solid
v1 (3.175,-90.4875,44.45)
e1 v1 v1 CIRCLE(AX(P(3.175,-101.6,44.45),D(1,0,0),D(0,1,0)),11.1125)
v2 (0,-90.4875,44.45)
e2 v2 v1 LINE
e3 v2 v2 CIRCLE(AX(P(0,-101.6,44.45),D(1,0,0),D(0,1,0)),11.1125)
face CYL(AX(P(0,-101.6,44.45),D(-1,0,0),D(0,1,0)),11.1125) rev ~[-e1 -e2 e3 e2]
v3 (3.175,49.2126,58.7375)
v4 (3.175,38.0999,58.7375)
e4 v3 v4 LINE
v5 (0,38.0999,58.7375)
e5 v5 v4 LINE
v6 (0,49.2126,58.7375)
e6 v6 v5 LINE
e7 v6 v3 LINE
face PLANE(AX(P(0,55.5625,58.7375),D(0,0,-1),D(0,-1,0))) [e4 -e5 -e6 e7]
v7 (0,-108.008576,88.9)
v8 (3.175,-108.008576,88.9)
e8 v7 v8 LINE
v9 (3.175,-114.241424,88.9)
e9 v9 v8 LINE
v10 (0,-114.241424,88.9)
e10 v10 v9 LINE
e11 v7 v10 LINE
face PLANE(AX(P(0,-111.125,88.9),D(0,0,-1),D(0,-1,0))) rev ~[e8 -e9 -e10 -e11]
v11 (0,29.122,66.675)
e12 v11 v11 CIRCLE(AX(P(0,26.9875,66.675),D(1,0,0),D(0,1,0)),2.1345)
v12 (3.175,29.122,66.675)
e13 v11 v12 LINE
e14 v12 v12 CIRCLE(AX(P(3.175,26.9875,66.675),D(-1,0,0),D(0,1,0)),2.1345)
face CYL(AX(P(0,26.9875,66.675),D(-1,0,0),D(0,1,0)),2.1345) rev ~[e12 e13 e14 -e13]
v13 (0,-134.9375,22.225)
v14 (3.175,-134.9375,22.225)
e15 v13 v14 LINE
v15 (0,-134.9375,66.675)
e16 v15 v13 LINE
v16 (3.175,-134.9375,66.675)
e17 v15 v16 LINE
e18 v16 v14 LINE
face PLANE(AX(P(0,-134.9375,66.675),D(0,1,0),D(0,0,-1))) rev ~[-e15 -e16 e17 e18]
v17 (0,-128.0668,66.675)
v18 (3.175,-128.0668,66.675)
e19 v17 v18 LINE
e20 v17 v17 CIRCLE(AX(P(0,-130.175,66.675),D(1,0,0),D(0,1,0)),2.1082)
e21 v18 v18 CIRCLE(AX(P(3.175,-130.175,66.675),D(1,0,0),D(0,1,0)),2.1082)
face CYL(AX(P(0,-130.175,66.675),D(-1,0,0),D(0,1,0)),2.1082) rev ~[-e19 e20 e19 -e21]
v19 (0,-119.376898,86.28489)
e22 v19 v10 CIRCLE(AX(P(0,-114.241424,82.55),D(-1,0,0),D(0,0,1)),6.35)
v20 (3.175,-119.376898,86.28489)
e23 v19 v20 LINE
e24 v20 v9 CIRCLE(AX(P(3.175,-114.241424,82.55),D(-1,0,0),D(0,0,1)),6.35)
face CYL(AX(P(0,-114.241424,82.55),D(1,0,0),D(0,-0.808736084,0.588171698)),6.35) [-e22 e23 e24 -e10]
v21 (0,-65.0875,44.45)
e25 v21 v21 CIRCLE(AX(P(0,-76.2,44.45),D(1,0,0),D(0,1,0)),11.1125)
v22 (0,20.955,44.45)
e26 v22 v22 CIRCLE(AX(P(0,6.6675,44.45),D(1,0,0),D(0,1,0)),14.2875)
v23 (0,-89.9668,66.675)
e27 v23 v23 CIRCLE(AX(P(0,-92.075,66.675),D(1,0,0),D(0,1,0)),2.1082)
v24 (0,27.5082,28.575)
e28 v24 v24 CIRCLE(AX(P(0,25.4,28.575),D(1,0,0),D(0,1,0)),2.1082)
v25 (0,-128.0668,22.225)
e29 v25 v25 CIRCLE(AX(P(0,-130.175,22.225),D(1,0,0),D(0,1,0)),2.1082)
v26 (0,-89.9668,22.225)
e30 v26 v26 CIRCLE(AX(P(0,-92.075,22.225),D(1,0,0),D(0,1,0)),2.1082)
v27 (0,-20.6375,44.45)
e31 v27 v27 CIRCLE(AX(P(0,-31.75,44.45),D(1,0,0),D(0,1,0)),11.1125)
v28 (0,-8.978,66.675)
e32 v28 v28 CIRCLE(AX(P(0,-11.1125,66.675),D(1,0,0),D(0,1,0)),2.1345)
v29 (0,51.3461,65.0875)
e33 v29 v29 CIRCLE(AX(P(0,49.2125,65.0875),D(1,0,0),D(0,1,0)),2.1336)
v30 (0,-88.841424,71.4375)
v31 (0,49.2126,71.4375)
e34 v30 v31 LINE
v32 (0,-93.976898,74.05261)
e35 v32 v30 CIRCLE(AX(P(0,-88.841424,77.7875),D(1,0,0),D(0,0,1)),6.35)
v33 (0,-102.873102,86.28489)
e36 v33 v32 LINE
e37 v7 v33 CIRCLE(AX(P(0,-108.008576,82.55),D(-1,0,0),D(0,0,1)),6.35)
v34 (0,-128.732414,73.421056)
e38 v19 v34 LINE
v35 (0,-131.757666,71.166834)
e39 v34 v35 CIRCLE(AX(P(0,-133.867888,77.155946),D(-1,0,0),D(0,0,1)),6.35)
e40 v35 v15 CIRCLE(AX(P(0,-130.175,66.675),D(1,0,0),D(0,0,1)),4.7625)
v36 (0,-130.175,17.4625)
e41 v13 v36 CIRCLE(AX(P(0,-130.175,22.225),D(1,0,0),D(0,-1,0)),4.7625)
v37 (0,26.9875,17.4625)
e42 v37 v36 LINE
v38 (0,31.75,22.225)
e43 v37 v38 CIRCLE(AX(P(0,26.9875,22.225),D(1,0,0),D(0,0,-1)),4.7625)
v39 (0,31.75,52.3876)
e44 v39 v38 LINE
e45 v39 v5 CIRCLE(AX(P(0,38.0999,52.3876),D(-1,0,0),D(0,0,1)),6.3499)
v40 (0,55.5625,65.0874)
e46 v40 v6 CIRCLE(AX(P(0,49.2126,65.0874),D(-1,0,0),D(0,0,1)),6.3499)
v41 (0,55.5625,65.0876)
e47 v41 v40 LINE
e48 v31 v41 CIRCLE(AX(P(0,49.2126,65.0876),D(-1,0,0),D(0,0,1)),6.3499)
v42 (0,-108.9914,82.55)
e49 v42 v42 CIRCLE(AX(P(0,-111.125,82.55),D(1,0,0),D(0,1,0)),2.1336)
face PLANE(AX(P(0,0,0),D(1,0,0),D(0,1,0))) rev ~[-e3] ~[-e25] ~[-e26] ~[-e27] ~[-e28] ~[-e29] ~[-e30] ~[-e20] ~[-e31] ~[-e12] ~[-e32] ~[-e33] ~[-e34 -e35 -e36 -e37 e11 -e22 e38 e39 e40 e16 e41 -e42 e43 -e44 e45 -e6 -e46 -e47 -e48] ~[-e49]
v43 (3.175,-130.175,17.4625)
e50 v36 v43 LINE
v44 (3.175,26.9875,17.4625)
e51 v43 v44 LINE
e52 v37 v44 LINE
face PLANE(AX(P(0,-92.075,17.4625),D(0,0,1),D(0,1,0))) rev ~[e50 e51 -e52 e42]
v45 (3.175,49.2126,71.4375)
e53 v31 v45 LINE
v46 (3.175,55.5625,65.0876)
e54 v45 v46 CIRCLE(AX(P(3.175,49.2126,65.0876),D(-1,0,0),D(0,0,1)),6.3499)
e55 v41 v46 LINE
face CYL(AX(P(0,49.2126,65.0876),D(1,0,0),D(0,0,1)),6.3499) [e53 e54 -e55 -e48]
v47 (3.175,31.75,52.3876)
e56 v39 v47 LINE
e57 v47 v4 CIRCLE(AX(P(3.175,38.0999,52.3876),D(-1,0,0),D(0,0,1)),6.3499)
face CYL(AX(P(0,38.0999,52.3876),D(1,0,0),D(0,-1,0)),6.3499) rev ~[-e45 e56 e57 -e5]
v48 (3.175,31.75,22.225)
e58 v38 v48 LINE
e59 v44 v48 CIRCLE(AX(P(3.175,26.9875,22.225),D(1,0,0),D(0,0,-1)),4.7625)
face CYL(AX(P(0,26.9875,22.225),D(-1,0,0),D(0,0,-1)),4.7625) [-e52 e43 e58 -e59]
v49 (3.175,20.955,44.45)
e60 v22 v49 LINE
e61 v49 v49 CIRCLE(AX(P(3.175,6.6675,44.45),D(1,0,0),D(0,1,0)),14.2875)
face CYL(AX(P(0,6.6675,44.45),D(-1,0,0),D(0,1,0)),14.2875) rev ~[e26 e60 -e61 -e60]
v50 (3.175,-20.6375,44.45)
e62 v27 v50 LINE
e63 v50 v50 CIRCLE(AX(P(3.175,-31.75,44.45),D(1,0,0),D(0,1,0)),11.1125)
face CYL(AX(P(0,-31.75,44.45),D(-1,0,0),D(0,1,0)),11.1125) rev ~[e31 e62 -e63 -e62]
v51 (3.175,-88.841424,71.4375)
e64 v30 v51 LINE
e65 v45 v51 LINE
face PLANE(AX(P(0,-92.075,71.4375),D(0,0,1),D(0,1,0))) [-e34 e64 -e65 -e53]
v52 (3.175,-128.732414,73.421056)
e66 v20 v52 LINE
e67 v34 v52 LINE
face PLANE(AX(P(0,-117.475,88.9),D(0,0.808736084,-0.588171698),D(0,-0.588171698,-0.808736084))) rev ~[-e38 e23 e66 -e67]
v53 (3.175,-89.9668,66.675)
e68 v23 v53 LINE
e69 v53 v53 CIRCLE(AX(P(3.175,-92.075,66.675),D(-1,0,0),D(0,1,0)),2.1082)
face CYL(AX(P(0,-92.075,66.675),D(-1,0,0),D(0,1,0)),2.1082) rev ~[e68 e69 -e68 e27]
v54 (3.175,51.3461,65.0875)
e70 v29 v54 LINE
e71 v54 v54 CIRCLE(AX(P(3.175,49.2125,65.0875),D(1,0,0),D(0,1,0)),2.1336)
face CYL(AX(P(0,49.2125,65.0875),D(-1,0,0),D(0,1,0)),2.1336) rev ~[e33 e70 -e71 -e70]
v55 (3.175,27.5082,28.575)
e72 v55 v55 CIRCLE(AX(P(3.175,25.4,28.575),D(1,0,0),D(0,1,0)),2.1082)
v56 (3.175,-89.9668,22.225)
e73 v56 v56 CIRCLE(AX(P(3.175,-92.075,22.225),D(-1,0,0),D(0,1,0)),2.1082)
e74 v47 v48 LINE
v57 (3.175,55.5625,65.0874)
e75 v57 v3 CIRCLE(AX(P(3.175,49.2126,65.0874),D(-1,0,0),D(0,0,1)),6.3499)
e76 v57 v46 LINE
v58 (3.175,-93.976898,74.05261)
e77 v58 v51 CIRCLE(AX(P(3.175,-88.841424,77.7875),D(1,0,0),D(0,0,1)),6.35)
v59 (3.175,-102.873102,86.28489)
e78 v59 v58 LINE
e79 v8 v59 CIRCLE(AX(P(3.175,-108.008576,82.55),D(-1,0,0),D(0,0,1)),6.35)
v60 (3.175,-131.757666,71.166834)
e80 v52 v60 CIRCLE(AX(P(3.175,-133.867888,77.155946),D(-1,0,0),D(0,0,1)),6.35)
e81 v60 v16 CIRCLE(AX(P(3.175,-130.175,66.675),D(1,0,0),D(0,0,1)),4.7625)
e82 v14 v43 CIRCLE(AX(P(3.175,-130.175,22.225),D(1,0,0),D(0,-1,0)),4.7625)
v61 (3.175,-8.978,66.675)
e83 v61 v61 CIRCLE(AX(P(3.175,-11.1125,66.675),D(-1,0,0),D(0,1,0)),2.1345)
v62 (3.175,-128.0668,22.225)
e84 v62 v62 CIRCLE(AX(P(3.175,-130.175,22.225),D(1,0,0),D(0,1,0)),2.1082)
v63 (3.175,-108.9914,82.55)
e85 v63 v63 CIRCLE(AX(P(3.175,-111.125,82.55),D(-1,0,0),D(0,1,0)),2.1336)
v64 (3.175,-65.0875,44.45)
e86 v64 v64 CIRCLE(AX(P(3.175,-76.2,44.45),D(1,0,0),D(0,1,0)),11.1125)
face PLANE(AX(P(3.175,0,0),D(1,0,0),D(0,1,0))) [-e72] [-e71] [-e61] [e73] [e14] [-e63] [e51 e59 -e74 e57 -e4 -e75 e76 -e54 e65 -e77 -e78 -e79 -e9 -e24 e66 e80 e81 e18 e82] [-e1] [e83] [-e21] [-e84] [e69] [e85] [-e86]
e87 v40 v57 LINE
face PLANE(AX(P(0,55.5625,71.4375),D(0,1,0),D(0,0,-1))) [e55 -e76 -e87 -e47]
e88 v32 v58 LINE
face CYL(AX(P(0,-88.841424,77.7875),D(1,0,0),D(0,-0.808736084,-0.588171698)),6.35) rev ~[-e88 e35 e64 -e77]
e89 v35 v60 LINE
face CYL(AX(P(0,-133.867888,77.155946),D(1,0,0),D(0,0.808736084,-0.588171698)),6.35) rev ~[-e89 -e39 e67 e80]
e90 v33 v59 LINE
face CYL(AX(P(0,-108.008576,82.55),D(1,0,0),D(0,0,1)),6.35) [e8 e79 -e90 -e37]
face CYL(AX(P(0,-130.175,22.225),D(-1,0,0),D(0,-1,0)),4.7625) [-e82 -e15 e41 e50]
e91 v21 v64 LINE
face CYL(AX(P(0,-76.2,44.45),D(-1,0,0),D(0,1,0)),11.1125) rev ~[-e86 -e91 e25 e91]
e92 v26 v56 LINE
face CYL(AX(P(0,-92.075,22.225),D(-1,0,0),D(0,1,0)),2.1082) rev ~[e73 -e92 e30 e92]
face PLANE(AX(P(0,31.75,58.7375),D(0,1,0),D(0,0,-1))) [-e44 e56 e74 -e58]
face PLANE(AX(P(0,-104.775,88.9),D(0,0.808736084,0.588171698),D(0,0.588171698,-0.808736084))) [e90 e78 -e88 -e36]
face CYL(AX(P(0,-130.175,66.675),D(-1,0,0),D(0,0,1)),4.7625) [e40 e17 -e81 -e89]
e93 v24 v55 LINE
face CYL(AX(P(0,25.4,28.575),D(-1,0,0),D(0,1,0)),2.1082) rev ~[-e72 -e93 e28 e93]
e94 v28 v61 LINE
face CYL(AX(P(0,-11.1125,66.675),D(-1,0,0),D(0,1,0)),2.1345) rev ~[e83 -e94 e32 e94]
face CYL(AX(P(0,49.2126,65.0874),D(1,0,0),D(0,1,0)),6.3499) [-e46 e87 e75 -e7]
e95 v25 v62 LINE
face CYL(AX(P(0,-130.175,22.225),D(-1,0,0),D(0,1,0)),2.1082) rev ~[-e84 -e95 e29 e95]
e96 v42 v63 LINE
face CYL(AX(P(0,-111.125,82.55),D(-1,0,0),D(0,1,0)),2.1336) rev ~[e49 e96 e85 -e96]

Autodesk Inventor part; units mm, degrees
ref_plane "YZ Plane" through (0, 0, 0) normal (1, 0, 0) x (0, 1, 0)
ref_plane "XZ Plane" through (0, 0, 0) normal (0, 1, 0) x (-1, 0, 0)
ref_plane "XY Plane" through (0, 0, 0) normal (0, 0, 1) x (1, 0, 0)
sketch "Sketch1" plane through (0, 0, 0) normal (1, 0, 0) x (0, 1, 0)
  circle A0 centre (-31.75, 44.45) radius 11.1125
  circle A1 centre (-76.2, 44.45) radius 11.1125
  circle A2 centre (-101.6, 44.45) radius 11.1125
  line L0 (-130.175, 71.4375) -> (-92.075, 71.4375)
  arc A3 (-130.175, 71.4375) -> (-134.9375, 66.675) centre (-130.175, 66.675) ccw
  arc A4 (26.9875, 17.4625) -> (31.75, 22.225) centre (26.9875, 22.225) ccw
  line L1 (-130.175, 17.4625) -> (-92.075, 17.4625)
  circle A5 centre (25.4, 28.575) radius 2.1082
  circle A6 centre (-92.075, 66.675) radius 2.1082
  line L2 (31.75, 66.675) -> (31.75, 22.225)
  circle A7 centre (-92.075, 22.225) radius 2.1082
  arc A8 (-134.9375, 22.225) -> (-130.175, 17.4625) centre (-130.175, 22.225) ccw
  circle A9 centre (-130.175, 66.675) radius 2.1082
  line L3 (-134.9375, 66.675) -> (-134.9375, 22.225)
  circle A10 centre (-130.175, 22.225) radius 2.1082
  line L4 (-92.075, 71.4375) -> (26.9875, 71.4375)
  arc A11 (31.75, 66.675) -> (26.9875, 71.4375) centre (26.9875, 66.675) ccw
  circle A12 centre (26.9875, 66.675) radius 2.1345
  line L5 (-92.075, 17.4625) -> (26.9875, 17.4625)
  line L6 (26.9875, 66.675) -> (-17.4625, 66.675)
  line L7 (-17.4625, 66.675) -> (-11.1125, 66.675)
  line L8 (-17.4625, 66.675) -> (-23.8125, 66.675)
  circle A13 centre (-11.1125, 66.675) radius 2.1345
  line L9 (26.9875, 44.45) -> (6.6675, 44.45)
  circle A14 centre (6.6675, 44.45) radius 14.2875
  line L10 (-130.175, 22.225) -> (-92.075, 22.225)
  line L11 (-111.125, 22.225) -> (-111.125, 6.35)
  circle A15 centre (-111.125, 6.35) radius 2.1336
  line L12 (-111.125, 6.35) -> (-111.125, 0)
  line L13 (-111.125, 0) -> (-117.475, 0)
  line L14 (-111.125, 0) -> (-104.775, 0)
  line L15 (-117.475, 0) -> (-130.175, 17.4625)
  line L16 (-104.775, 0) -> (-92.075, 17.4625)
  line L17 (-130.175, 66.675) -> (-92.075, 66.675)
  line L18 (-111.125, 66.675) -> (-111.125, 82.55)
  circle A16 centre (-111.125, 82.55) radius 2.1336
  line L19 (-111.125, 82.55) -> (-111.125, 88.9)
  line L20 (-111.125, 88.9) -> (-117.475, 88.9)
  line L21 (-117.475, 88.9) -> (-104.775, 88.9)
  line L22 (-104.775, 88.9) -> (-92.075, 71.4375)
  line L23 (-117.475, 88.9) -> (-130.175, 71.4375)
  line L24 (26.9875, 71.4375) -> (55.5625, 71.4375)
  line L25 (55.5625, 71.4375) -> (55.5625, 58.7375)
  line L26 (55.5625, 58.7375) -> (31.75, 58.7375)
  line L27 (55.5625, 65.0875) -> (49.2125, 65.0875)
  circle A17 centre (49.2125, 65.0875) radius 2.1336
  point P0 (0, 0)
  point P1 (26.9875, 71.4375)
  dimension "d2" = 6.35
  dimension "d3" = 6.35
  dimension "d4" = 44.45
  dimension "d5" = 20.32
  dimension "d6" = 28.575
  dimension "d7" = 4.2672
  dimension "d8" = 6.35
  dimension "d9" = 6.35
  dimension "d10" = 6.35
  dimension "d11" = 15.875
  dimension "d12" = 4.2672
  dimension "d13" = 6.35
  dimension "d14" = 6.35
  dimension "d15" = 12.7
  dimension "d21" = 28.575
  dimension "d22" = 6.35
  dimension "d23" = 4.2672
extrude "Extrusion1" add sketch "Sketch1" along normal blind 3.175 contours L23 L20 L19 A16 L18 L0 | L0 L4 A11 L2 A4 L5 L1 A8 L3 A3 | L18 A16 L19 L21 L22 L0 | L24 L25 L26 L2 A11
fillet "Fillet1" radius 6.35 4 edges at (1.5875, -130.175, 71.4375) (1.5875, -117.475, 88.9) (1.5875, -104.775, 88.9) (1.5875, -92.075, 71.4375)
fillet "Fillet3" radius 6.35 3 edges at (1.5875, 31.75, 58.7375) (1.5875, 55.5625, 58.7375) (1.5875, 55.5625, 71.4375)
properties part number "winch plate"
